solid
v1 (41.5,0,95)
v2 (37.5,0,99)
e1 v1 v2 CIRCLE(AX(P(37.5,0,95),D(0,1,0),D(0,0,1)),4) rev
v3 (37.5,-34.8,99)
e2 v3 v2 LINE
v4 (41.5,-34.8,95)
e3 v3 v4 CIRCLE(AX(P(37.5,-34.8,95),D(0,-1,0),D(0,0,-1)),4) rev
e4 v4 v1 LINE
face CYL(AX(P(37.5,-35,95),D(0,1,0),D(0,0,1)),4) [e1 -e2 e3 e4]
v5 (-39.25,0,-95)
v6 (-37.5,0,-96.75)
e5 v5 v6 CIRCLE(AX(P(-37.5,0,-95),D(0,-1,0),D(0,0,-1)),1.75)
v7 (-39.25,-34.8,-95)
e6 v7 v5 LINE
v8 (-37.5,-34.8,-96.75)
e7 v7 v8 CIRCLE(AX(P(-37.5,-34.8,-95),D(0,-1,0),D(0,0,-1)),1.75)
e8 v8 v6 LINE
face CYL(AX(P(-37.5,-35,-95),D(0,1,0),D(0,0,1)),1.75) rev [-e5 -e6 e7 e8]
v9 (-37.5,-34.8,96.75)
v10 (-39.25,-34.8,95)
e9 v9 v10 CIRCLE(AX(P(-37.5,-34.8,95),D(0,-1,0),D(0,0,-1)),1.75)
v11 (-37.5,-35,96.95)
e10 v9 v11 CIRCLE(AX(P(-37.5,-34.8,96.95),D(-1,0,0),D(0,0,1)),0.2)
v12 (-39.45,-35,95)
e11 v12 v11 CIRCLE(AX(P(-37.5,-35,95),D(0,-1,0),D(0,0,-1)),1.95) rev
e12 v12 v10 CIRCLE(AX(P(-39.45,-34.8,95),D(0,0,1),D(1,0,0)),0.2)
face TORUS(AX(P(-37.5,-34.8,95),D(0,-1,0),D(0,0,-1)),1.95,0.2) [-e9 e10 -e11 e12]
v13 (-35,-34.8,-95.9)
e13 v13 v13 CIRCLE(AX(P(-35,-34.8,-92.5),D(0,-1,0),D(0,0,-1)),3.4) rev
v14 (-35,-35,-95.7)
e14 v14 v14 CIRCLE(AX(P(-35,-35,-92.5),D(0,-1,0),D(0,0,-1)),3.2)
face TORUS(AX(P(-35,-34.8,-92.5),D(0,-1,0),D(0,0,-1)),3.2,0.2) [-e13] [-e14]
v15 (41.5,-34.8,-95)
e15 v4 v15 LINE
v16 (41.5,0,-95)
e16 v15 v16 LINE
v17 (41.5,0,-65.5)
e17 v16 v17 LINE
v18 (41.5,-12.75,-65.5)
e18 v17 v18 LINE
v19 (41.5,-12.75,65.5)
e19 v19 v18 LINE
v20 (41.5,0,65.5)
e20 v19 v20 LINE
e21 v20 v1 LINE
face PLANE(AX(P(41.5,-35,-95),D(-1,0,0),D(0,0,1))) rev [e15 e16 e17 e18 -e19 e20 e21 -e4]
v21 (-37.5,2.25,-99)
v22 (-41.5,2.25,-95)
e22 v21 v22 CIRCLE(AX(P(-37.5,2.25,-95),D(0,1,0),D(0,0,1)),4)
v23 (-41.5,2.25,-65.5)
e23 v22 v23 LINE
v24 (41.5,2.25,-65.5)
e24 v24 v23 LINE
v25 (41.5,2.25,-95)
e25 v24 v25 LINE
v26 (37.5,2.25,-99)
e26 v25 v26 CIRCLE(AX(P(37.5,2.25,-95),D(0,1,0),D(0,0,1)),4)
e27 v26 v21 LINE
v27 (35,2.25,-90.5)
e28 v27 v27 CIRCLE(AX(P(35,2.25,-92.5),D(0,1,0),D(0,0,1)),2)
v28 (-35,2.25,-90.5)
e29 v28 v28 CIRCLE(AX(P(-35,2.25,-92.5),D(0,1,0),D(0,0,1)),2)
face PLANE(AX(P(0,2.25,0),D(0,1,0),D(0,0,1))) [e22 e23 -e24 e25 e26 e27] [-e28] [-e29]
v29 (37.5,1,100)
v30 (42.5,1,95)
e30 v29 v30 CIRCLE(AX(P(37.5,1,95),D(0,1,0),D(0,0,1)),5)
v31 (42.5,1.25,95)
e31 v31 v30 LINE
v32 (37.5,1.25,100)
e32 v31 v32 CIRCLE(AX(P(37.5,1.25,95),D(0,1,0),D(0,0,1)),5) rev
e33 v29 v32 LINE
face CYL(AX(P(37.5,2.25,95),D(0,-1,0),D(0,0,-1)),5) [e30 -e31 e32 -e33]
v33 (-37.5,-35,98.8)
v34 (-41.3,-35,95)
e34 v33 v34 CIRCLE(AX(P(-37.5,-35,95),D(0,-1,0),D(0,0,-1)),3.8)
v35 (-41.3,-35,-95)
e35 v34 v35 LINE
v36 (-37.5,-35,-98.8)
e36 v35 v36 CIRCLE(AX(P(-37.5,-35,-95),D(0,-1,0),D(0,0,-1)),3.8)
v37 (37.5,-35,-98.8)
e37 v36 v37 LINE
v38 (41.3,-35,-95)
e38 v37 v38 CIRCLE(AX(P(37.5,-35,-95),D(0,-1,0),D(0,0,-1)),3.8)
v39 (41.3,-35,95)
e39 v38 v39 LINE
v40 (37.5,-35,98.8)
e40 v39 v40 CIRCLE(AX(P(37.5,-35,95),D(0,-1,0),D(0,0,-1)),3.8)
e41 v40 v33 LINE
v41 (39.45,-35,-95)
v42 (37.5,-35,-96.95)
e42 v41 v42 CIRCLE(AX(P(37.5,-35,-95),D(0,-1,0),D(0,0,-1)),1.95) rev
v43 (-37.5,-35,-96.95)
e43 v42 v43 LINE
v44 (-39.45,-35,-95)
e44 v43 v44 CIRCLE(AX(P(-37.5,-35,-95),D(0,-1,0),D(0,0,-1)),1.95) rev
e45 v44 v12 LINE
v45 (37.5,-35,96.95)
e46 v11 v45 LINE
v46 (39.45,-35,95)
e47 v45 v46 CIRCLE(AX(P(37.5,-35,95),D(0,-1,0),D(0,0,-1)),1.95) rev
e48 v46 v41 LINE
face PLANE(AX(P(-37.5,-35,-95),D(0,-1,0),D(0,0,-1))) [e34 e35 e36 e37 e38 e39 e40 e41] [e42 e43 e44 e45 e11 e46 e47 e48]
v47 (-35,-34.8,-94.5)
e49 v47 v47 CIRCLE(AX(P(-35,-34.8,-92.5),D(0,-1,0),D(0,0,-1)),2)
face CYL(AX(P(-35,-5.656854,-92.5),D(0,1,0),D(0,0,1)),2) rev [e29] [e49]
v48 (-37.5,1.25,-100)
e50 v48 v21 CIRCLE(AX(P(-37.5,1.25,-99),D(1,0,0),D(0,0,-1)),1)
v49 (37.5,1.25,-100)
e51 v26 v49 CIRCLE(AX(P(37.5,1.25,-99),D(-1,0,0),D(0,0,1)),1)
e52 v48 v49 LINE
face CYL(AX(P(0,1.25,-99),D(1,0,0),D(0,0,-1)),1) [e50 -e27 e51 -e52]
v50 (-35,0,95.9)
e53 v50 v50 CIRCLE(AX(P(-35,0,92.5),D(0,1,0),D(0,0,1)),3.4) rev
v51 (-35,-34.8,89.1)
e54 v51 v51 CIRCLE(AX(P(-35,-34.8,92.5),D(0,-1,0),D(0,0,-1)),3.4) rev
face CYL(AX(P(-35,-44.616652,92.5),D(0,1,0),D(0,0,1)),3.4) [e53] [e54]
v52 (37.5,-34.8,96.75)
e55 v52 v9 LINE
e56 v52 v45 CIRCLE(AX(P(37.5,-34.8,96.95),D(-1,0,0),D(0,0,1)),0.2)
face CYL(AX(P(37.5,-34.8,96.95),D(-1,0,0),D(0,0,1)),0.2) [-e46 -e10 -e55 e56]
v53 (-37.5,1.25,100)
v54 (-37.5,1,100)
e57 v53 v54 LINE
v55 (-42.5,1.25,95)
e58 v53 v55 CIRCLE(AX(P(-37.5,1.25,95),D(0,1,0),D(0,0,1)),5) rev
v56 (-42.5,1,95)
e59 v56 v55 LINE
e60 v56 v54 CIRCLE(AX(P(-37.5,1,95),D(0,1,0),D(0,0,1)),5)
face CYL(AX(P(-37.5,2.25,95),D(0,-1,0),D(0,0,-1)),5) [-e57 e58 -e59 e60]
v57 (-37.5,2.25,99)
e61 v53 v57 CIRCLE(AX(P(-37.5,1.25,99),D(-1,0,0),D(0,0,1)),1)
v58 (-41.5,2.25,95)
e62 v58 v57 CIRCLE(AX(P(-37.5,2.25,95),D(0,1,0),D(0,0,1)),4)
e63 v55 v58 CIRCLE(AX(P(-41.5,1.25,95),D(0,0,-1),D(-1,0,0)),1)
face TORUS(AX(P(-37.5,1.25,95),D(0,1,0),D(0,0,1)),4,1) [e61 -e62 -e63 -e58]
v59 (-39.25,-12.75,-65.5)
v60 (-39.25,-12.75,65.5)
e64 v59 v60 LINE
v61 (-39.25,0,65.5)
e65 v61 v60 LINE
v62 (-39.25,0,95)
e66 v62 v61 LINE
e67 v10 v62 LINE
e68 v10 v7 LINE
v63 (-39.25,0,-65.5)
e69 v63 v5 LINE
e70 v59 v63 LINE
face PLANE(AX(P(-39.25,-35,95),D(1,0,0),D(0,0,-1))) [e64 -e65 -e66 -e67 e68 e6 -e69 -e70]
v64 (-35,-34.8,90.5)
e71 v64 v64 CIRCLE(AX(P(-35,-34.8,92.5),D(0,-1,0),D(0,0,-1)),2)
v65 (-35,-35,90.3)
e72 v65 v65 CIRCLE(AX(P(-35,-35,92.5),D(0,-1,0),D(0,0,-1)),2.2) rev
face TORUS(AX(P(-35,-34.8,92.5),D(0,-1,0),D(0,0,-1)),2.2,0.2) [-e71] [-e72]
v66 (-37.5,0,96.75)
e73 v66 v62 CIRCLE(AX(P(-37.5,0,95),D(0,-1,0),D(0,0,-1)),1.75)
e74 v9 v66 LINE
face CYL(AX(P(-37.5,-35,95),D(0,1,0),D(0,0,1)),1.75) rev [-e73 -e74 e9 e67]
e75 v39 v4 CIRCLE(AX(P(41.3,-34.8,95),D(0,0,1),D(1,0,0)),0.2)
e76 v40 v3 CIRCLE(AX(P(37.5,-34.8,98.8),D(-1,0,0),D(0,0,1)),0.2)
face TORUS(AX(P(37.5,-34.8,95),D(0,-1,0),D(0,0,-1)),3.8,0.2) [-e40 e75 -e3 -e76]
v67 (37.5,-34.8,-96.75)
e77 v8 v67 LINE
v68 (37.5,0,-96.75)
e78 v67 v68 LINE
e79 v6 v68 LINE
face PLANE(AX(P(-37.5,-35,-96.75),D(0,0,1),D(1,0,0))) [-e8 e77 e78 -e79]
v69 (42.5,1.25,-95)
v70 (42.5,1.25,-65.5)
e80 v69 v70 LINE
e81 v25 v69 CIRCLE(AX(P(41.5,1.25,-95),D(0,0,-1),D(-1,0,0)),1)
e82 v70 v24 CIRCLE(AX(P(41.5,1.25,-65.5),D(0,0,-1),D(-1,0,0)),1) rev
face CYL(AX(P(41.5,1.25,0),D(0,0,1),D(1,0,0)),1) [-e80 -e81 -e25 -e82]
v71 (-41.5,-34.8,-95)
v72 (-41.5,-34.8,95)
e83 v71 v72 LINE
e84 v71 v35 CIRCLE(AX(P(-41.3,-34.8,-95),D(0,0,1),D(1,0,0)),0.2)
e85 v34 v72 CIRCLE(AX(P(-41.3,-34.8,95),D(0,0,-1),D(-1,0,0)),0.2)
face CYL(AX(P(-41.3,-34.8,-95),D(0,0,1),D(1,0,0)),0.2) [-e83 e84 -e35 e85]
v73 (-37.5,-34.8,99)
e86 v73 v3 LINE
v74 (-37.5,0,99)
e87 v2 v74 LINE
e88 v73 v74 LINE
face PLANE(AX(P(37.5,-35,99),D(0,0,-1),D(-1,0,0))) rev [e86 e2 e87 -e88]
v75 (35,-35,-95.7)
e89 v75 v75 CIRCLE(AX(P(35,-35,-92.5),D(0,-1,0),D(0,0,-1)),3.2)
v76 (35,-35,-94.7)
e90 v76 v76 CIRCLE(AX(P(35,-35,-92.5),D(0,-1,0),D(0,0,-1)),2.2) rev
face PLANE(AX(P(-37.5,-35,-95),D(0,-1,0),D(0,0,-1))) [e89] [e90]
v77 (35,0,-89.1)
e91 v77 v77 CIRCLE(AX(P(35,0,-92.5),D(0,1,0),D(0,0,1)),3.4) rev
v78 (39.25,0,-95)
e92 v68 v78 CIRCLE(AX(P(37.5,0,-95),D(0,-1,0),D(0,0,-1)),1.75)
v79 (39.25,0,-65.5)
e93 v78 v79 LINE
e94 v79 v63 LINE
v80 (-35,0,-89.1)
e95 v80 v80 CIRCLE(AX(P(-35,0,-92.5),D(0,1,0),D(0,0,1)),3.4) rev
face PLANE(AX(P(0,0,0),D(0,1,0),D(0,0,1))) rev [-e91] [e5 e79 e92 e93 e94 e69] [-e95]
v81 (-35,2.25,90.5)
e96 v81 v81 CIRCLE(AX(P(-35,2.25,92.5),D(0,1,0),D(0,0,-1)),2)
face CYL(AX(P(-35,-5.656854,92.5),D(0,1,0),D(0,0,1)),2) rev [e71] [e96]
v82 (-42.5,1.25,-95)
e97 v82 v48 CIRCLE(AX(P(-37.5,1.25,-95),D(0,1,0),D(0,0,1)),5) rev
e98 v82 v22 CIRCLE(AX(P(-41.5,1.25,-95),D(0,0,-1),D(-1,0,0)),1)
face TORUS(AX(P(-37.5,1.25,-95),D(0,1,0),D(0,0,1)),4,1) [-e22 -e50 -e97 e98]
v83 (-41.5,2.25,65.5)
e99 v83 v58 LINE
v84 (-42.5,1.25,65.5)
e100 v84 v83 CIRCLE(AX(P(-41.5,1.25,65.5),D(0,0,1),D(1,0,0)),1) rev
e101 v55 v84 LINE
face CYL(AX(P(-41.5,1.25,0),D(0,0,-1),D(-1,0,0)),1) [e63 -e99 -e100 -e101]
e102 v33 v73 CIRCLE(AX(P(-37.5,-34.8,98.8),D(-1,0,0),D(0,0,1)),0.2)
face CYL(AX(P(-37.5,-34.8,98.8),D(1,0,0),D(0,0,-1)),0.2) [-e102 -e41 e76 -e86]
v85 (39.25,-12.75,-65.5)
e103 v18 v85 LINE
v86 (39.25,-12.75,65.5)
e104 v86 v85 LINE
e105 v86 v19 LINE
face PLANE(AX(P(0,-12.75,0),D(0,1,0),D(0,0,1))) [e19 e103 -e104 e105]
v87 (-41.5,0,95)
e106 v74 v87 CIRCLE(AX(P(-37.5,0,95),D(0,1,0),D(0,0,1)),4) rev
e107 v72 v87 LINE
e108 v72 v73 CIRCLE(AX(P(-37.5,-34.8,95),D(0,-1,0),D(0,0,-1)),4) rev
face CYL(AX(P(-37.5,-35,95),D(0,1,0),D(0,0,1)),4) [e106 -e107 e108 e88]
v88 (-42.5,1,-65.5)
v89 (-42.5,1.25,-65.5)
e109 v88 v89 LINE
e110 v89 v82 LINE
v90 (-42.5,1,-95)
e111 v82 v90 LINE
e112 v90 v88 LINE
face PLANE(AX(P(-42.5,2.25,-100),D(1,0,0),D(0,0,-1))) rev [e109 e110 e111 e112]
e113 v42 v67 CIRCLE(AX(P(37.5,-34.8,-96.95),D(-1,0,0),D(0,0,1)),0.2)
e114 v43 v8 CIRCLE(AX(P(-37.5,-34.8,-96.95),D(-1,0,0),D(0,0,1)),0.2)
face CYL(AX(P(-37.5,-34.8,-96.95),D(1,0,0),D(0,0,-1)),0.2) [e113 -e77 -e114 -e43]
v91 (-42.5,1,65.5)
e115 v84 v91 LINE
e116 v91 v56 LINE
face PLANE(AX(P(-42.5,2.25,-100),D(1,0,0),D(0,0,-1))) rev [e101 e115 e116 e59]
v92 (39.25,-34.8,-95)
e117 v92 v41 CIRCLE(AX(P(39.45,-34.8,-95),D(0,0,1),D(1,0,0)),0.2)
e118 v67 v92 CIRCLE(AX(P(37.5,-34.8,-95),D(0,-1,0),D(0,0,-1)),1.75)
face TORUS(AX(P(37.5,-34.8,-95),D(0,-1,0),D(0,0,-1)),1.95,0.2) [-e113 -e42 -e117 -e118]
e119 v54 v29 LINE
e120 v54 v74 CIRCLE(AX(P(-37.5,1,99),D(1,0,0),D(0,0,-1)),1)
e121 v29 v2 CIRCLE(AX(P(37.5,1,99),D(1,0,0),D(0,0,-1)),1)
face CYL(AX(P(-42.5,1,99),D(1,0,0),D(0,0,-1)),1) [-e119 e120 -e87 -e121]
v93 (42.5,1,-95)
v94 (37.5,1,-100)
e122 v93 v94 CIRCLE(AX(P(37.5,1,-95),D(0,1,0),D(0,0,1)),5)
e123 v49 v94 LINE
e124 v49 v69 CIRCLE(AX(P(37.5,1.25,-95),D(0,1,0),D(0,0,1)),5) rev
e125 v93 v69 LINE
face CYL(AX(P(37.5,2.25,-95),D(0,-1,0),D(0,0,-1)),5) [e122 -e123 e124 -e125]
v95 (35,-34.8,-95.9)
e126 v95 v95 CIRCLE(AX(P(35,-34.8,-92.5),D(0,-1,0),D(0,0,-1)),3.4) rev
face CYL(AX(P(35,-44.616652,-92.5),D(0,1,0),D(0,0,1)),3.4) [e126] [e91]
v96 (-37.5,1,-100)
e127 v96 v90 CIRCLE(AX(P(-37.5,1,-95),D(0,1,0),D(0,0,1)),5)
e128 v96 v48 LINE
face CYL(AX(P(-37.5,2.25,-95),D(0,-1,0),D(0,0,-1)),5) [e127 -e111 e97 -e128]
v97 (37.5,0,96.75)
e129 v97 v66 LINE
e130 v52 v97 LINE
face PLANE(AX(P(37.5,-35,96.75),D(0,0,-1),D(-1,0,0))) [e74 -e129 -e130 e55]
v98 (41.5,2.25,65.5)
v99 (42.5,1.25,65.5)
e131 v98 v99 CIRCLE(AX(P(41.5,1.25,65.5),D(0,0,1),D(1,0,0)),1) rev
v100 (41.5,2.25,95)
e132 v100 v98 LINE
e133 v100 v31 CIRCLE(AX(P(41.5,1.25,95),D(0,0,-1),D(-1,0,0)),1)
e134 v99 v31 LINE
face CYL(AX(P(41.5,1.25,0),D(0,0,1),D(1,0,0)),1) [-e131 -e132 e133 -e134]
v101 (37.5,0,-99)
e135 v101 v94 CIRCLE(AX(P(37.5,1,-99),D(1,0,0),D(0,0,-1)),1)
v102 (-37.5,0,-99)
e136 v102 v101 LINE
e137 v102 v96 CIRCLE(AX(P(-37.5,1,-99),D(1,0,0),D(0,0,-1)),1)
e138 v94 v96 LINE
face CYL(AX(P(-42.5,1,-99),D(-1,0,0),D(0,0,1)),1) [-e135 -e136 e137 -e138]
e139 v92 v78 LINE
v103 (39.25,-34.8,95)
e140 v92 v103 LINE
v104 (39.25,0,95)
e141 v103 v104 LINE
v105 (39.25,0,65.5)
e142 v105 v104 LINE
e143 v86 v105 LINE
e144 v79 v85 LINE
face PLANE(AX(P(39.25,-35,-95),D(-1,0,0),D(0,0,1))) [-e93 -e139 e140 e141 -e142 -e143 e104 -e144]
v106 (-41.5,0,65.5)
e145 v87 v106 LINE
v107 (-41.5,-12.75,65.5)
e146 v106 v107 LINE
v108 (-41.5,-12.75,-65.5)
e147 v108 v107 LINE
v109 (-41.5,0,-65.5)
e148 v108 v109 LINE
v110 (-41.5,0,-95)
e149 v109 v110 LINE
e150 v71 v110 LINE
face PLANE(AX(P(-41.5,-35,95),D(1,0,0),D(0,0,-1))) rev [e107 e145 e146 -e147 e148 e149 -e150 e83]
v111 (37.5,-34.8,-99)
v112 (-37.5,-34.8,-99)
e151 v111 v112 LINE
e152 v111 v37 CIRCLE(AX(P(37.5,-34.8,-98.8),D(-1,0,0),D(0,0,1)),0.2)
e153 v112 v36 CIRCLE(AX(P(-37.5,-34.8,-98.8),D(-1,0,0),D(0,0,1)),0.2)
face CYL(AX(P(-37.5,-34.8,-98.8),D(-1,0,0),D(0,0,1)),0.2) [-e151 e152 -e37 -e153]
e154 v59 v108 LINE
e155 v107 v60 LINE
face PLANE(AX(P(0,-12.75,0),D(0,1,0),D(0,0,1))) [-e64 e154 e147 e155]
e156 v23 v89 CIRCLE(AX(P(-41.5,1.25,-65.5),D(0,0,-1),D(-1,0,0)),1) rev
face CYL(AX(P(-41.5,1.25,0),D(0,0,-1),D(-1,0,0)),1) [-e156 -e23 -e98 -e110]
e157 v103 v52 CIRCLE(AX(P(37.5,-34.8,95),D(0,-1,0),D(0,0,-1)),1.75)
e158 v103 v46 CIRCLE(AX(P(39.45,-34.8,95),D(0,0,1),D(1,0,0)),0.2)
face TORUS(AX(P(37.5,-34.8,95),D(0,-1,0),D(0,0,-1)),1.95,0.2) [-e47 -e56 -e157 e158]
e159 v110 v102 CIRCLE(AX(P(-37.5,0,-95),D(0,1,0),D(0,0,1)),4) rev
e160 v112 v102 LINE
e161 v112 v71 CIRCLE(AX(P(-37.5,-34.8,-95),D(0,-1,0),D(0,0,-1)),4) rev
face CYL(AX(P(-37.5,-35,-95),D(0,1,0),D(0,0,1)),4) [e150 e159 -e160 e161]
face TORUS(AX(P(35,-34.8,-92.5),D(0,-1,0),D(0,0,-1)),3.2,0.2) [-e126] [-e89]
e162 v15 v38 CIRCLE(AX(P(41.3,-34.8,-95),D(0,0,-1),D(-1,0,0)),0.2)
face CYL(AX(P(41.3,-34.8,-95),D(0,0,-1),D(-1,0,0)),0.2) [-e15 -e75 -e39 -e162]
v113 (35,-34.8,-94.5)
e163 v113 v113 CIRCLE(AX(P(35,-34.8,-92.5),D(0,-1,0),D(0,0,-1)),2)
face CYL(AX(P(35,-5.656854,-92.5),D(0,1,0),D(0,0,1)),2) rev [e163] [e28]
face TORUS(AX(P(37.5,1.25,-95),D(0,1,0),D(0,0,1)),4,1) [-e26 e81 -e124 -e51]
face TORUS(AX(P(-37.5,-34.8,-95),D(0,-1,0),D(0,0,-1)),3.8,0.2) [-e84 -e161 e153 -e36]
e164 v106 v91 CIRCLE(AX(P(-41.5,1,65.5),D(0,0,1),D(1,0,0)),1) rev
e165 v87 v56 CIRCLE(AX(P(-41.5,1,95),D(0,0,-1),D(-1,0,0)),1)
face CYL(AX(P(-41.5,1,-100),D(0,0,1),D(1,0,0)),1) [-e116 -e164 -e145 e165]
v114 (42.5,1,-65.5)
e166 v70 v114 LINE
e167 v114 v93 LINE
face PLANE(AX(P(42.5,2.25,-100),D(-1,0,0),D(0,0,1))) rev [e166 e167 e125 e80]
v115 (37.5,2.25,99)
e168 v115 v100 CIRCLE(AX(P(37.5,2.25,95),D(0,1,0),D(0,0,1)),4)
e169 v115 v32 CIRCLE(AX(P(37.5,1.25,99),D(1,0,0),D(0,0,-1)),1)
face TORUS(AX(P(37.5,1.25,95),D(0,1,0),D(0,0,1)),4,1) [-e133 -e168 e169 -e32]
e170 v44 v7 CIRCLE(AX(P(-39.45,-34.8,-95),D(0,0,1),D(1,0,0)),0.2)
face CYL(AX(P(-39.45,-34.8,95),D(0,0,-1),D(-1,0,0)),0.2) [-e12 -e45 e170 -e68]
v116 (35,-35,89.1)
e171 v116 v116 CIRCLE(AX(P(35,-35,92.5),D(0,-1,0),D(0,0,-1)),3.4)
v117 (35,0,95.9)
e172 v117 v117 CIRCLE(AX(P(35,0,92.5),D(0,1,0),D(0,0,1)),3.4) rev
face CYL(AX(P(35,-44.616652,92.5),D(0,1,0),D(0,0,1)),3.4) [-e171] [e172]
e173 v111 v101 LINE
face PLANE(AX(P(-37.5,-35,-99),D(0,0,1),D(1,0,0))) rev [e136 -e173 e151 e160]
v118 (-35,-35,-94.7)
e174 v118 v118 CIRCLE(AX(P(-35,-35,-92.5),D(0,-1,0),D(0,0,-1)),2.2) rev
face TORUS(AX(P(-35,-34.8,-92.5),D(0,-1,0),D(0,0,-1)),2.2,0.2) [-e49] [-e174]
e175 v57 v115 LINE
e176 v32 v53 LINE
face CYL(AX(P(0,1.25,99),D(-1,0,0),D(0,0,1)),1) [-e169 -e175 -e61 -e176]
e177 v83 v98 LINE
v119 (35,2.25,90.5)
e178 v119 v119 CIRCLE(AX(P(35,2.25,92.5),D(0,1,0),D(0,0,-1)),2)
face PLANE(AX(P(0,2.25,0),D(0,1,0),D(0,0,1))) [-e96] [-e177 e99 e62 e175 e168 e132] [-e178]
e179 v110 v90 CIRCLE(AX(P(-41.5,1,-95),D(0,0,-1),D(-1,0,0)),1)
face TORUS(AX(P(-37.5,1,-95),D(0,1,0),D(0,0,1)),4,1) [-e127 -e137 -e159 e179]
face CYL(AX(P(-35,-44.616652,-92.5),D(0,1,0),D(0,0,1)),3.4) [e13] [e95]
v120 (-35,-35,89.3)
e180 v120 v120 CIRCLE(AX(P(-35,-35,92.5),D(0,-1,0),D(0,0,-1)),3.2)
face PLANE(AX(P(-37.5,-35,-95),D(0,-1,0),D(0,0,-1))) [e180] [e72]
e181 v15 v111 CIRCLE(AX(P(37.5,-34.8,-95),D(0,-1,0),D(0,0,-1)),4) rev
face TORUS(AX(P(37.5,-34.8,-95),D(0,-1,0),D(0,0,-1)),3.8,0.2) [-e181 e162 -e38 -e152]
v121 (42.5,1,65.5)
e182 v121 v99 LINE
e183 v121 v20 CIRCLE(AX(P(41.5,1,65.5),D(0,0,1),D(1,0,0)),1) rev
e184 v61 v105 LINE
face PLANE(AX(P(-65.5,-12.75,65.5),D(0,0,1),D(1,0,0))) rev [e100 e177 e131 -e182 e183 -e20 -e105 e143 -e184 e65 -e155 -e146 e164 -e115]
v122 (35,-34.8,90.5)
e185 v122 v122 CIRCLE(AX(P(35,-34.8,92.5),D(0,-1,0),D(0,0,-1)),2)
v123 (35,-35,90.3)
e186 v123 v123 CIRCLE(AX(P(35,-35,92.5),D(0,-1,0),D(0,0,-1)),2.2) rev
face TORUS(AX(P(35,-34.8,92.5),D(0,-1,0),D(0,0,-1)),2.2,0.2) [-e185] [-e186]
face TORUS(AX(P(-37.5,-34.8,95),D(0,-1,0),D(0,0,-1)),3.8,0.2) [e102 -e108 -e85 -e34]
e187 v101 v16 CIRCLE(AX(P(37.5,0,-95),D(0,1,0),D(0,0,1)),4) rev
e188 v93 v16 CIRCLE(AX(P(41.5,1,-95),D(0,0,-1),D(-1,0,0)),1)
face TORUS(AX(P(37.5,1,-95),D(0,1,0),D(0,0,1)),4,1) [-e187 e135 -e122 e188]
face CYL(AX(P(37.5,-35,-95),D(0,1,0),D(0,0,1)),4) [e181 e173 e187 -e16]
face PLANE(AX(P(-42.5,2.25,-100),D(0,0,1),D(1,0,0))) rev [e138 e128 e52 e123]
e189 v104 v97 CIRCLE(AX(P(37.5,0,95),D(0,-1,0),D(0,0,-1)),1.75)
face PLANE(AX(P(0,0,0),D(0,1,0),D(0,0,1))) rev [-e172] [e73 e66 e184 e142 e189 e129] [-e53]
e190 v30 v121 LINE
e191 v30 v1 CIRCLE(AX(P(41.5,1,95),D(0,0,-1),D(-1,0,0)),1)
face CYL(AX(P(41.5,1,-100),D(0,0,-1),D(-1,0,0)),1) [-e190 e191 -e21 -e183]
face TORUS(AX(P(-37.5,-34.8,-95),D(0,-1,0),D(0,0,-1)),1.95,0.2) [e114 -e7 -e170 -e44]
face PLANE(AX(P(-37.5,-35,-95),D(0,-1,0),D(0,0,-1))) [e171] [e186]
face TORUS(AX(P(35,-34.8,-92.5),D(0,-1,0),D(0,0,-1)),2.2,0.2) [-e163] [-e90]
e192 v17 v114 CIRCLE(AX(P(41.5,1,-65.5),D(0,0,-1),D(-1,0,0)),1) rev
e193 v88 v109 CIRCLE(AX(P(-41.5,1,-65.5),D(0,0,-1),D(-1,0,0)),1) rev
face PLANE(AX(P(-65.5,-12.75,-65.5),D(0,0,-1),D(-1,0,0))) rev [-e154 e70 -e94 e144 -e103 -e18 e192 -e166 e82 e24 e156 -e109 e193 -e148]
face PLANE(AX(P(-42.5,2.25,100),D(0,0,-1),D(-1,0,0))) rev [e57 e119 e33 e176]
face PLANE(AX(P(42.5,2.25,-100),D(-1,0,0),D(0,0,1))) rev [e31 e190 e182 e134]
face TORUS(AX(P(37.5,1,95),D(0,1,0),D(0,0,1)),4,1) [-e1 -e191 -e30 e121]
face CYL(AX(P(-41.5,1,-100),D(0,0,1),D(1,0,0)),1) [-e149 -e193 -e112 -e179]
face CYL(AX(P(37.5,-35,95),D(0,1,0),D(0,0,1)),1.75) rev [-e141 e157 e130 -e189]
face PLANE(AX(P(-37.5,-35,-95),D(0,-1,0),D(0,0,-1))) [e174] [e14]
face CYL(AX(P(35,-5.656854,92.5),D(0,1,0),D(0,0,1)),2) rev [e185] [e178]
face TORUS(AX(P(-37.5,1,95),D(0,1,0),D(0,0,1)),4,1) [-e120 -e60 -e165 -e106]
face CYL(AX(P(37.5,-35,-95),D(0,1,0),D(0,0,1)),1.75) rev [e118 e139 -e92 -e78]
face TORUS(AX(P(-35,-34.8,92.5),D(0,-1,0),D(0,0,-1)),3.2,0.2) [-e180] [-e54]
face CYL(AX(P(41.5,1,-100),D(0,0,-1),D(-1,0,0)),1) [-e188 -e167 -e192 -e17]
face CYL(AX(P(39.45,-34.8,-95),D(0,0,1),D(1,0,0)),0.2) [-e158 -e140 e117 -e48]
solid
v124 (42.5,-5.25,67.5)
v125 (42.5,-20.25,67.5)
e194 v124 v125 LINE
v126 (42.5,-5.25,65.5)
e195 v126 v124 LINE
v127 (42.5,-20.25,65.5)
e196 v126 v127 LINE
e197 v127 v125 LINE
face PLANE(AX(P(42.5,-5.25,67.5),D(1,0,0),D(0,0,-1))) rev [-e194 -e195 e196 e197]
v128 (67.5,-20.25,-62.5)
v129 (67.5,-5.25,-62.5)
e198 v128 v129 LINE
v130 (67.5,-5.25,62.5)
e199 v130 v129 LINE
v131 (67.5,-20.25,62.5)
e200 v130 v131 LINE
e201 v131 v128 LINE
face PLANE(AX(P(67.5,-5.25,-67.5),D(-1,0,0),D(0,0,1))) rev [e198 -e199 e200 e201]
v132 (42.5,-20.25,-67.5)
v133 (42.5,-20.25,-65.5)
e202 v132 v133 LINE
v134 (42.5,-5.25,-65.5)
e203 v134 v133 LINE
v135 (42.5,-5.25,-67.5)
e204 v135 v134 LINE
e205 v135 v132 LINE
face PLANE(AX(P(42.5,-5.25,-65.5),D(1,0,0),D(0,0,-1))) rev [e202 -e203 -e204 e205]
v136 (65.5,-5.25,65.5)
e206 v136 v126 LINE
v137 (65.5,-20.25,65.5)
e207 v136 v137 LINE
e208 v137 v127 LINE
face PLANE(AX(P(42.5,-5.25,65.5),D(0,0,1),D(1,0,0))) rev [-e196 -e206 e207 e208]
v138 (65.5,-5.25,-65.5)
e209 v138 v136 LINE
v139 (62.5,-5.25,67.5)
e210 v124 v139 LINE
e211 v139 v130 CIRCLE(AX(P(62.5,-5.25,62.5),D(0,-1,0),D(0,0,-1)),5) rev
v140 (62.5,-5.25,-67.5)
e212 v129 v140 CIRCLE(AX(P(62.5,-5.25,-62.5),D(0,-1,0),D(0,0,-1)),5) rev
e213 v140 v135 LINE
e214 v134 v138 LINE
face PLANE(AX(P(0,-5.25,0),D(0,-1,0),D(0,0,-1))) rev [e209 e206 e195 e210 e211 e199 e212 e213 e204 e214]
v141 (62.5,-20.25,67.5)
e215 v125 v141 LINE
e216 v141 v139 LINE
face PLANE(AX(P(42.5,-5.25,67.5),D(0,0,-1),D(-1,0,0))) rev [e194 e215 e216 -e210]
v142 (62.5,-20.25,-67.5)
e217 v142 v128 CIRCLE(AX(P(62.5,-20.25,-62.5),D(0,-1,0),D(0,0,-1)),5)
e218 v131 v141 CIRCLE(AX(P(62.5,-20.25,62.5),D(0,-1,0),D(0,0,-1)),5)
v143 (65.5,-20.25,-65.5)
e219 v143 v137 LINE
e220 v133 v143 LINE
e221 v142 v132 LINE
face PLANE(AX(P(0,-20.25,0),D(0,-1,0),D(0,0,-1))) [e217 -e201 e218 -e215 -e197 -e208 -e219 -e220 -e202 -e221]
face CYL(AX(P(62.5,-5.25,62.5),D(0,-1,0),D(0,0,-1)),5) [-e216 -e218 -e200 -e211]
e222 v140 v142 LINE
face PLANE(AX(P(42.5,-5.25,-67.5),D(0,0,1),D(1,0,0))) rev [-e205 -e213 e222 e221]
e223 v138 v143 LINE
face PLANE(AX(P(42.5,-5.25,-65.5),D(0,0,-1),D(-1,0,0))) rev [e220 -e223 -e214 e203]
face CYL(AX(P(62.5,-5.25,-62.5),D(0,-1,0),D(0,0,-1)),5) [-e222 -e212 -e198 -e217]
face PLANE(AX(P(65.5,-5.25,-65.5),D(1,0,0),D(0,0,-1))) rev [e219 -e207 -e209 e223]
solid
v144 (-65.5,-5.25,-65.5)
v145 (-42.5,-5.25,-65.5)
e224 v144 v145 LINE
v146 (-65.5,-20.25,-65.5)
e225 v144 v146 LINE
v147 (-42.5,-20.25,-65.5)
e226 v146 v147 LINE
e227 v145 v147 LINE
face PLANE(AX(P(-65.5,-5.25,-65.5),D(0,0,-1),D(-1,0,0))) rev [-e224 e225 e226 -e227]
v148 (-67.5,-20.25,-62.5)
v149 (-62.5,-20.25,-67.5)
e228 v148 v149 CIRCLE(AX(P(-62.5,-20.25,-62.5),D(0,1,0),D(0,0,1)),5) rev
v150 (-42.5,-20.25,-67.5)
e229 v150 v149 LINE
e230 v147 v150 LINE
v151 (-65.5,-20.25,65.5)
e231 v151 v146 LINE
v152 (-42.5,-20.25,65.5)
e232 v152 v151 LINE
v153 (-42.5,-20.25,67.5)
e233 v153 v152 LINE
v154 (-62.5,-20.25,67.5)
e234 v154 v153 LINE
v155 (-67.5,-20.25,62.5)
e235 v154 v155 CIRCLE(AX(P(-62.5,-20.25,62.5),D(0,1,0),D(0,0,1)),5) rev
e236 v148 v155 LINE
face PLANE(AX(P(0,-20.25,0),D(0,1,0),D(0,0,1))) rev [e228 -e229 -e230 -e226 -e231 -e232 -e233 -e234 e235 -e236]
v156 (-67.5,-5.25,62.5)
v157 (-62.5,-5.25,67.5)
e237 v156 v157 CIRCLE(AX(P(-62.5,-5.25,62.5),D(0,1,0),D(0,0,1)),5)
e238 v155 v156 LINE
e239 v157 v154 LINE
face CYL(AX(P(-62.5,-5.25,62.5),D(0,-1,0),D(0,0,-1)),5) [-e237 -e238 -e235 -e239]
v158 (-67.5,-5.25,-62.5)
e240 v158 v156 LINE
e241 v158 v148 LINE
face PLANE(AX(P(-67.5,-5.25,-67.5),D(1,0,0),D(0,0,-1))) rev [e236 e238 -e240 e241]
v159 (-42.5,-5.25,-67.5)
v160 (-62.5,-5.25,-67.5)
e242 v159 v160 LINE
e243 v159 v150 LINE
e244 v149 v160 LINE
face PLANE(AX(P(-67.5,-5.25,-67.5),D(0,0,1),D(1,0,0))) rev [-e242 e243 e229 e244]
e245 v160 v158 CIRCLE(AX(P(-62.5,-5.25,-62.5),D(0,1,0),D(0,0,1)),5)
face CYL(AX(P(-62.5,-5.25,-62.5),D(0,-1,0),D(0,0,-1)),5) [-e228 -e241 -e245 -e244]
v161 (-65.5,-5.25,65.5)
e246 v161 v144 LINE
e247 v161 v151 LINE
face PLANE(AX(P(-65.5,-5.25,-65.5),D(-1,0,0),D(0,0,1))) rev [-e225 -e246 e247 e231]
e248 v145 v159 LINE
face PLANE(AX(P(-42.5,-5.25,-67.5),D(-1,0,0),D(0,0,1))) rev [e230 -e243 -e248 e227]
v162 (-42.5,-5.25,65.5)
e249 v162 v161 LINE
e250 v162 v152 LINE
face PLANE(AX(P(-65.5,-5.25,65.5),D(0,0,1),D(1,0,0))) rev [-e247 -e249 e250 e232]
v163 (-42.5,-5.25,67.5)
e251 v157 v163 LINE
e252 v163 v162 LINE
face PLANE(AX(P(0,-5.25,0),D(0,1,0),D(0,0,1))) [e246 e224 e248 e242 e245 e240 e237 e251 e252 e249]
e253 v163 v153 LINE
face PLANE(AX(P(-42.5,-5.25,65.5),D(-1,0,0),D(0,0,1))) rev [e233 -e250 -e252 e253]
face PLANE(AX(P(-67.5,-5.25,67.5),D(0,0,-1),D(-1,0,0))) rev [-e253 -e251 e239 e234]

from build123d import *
from build123d.topology import SkipClean

# Parameters (mm, degrees)
SKETCH1_W             = 85
SKETCH1_H             = 200
BOSS_EXTRUDE1_DEPTH   = 2.25
SKETCH2_R             = 2
CUT_EXTRUDE1_DEPTH    = 2.25
FILLET1_R             = 5
FILLET2_R             = 1
BOSS_EXTRUDE2_DEPTH   = 35
SKETCH4_R             = 3.4
SKETCH4_R_2           = 2
BOSS_EXTRUDE3_DEPTH   = 35
FILLET3_R             = 0.2
SKETCH5_W             = 131
SKETCH5_H             = 131
CUT_EXTRUDE2_DEPTH    = 15
BOSS_EXTRUDE4_DEPTH   = 7.5
BOSS_EXTRUDE4_2_DEPTH = 7.5
FILLET4_R             = 5
FILLET5_R             = 5


with BuildPart() as part:
    # Sketch1 → Boss-Extrude1 (new body)
    with BuildSketch(Plane(origin=(0, 0, 0), x_dir=(1, 0, 0), z_dir=(0, 1, 0))):
        Rectangle(SKETCH1_W, SKETCH1_H)
    extrude(amount=BOSS_EXTRUDE1_DEPTH)

    # Sketch2 → Cut-Extrude1 (cut)
    with BuildSketch(Plane(origin=(0, 2.25, 0), x_dir=(1, 0, 0), z_dir=(0, 1, 0))):
        with Locations(Location((-35, 92.5, 0), (0, 0, 270))):
            Circle(SKETCH2_R)
        with Locations(Location((35, 92.5, 0), (0, 0, 270))):
            Circle(SKETCH2_R)
        with Locations(Location((35, -92.5, 0), (0, 0, 270))):
            Circle(SKETCH2_R)
        with Locations(Location((-35, -92.5, 0), (0, 0, 270))):
            Circle(SKETCH2_R)
    extrude(amount=-CUT_EXTRUDE1_DEPTH, mode=Mode.SUBTRACT)

    # Fillet1
    fillet1_edges = [part.edges().sort_by_distance(p)[0] for p in [
        (42.5, 1.125, 100),
        (-42.5, 1.125, 100),
        (-42.5, 1.125, -100),
        (42.5, 1.125, -100),
    ]]
    fillet(fillet1_edges, radius=FILLET1_R)

    # Fillet2
    fillet2_edges = [part.edges().sort_by_distance(p)[0] for p in [
        (-42.5, 0, 0),
        (-42.5, 2.25, 0),
        (42.5, 0, 0),
        (0, 0, 100),
        (0, 0, -100),
        (-41.035533906, 0, 98.535533906),
        (41.035533906, 0, 98.535533906),
        (41.035533906, 0, -98.535533906),
        (-41.035533906, 0, -98.535533906),
        (0, 2.25, -100),
        (42.5, 2.25, 0),
        (0, 2.25, 100),
        (-41.035533906, 2.25, 98.535533906),
        (41.035533906, 2.25, 98.535533906),
        (41.035533906, 2.25, -98.535533906),
        (-41.035533906, 2.25, -98.535533906),
    ]]
    fillet(fillet2_edges, radius=FILLET2_R)

    # Sketch3 → Boss-Extrude2 (add)
    with BuildSketch(Plane.XZ):
        with BuildLine():
            Line((-37.5, -99), (37.5, -99))
            ThreePointArc((37.5, -99), (40.328427125, -97.828427125), (41.5, -95))
            Line((41.5, -95), (41.5, 95))
            ThreePointArc((41.5, 95), (40.328427125, 97.828427125), (37.5, 99))
            Line((37.5, 99), (-37.5, 99))
            ThreePointArc((-37.5, 99), (-40.328427125, 97.828427125), (-41.5, 95))
            Line((-41.5, 95), (-41.5, -95))
            ThreePointArc((-41.5, -95), (-40.328427125, -97.828427125), (-37.5, -99))
        make_face()
        with BuildLine():
            Line((37.5, 96.75), (-37.5, 96.75))
            ThreePointArc((-37.5, 96.75), (-38.737436867, 96.237436867), (-39.25, 95))
            Line((-39.25, 95), (-39.25, -95))
            ThreePointArc((-39.25, -95), (-38.737436867, -96.237436867), (-37.5, -96.75))
            Line((-37.5, -96.75), (37.5, -96.75))
            ThreePointArc((37.5, -96.75), (38.737436867, -96.237436867), (39.25, -95))
            Line((39.25, -95), (39.25, 95))
            ThreePointArc((39.25, 95), (38.737436867, 96.237436867), (37.5, 96.75))
        make_face(mode=Mode.SUBTRACT)
    extrude(amount=BOSS_EXTRUDE2_DEPTH)

    # Sketch4 → Boss-Extrude3 (add)
    # profile 1 of 4: a face of its own
    with SkipClean():  # the faces are left unmerged after this step: merging them gives an invalid solid
        with BuildSketch(Plane.XZ):
            with Locations(Location((-35, 92.5, 0), (0, 0, 90))):
                Circle(SKETCH4_R)
            with Locations(Location((-35, 92.5, 0), (0, 0, 270))):
                Circle(SKETCH4_R_2, mode=Mode.SUBTRACT)
        # profile 2 of 4: a face of its own
        with BuildSketch(Plane.XZ):
            with Locations(Location((35, 92.5, 0), (0, 0, 90))):
                Circle(SKETCH4_R)
            with Locations(Location((35, 92.5, 0), (0, 0, 270))):
                Circle(SKETCH4_R_2, mode=Mode.SUBTRACT)
        # profile 3 of 4: a face of its own
        with BuildSketch(Plane.XZ):
            with Locations(Location((-35, -92.5, 0), (0, 0, 90))):
                Circle(SKETCH4_R)
            with Locations(Location((-35, -92.5, 0), (0, 0, 90))):
                Circle(SKETCH4_R_2, mode=Mode.SUBTRACT)
        # profile 4 of 4: a face of its own
        with BuildSketch(Plane.XZ):
            with Locations(Location((35, -92.5, 0), (0, 0, 90))):
                Circle(SKETCH4_R)
            with Locations(Location((35, -92.5, 0), (0, 0, 90))):
                Circle(SKETCH4_R_2, mode=Mode.SUBTRACT)
        extrude(amount=BOSS_EXTRUDE3_DEPTH)
    add(part.part.scale(1), mode=Mode.REPLACE)  # the faces are merged on a copy

    # Fillet3
    fillet3_edges = [part.edges().sort_by_distance(p)[0] for p in [
        (-40.328427125, -35, -97.828427125),
        (0, -35, -99),
        (40.328427125, -35, -97.828427125),
        (41.5, -35, 0),
        (40.328427125, -35, 97.828427125),
        (0, -35, 99),
        (-40.328427125, -35, 97.828427125),
        (-41.5, -35, 0),
        (38.737436867, -35, 96.237436867),
        (0, -35, 96.75),
        (-38.737436867, -35, 96.237436867),
        (-39.25, -35, 0),
        (-38.737436867, -35, -96.237436867),
        (0, -35, -96.75),
        (38.737436867, -35, -96.237436867),
        (39.25, -35, 0),
        (-35, -35, 94.5),
        (-35, -35, 89.1),
        (35, -35, 94.5),
        (-35, -35, -94.5),
        (-35, -35, -95.9),
        (35, -35, -94.5),
        (35, -35, -95.9),
    ]]
    fillet(fillet3_edges, radius=FILLET3_R)

    # Sketch5 → Cut-Extrude2 (cut)
    with BuildSketch(Plane(origin=(0, 2.25, 0), x_dir=(1, 0, 0), z_dir=(0, 1, 0))):
        Rectangle(SKETCH5_W, SKETCH5_H)
    extrude(amount=-CUT_EXTRUDE2_DEPTH, mode=Mode.SUBTRACT)


with BuildPart() as body_2:
    # Sketch6 → Boss-Extrude4 (new, symmetric)
    with BuildSketch(Plane(origin=(0, -12.75, 0), x_dir=(1, 0, 0), z_dir=(0, 1, 0))):
        Polygon((-65.5, -65.5), (-42.5, -65.5), (-42.5, -67.5), (-67.5, -67.5), (-67.5, 67.5), (-42.5, 67.5), (-42.5, 65.5), (-65.5, 65.5), align=None)
    extrude(amount=BOSS_EXTRUDE4_DEPTH, both=True)

    # Fillet4
    fillet4_edges = [body_2.edges().sort_by_distance(p)[0] for p in [
        (-67.5, -12.75, 67.5),
        (-67.5, -12.75, -67.5),
    ]]
    fillet(fillet4_edges, radius=FILLET4_R)


with BuildPart() as body_3:
    # Sketch6 → Boss-Extrude4 2 (new, symmetric)
    with BuildSketch(Plane(origin=(0, -12.75, 0), x_dir=(1, 0, 0), z_dir=(0, 1, 0))):
        Polygon((65.5, 65.5), (65.5, -65.5), (42.5, -65.5), (42.5, -67.5), (67.5, -67.5), (67.5, 67.5), (42.5, 67.5), (42.5, 65.5), align=None)
    extrude(amount=BOSS_EXTRUDE4_2_DEPTH, both=True)

    # Fillet5
    fillet5_edges = [body_3.edges().sort_by_distance(p)[0] for p in [
        (67.5, -12.75, -67.5),
        (67.5, -12.75, 67.5),
    ]]
    fillet(fillet5_edges, radius=FILLET5_R)


solid = Compound([part.part, body_2.part, body_3.part])
